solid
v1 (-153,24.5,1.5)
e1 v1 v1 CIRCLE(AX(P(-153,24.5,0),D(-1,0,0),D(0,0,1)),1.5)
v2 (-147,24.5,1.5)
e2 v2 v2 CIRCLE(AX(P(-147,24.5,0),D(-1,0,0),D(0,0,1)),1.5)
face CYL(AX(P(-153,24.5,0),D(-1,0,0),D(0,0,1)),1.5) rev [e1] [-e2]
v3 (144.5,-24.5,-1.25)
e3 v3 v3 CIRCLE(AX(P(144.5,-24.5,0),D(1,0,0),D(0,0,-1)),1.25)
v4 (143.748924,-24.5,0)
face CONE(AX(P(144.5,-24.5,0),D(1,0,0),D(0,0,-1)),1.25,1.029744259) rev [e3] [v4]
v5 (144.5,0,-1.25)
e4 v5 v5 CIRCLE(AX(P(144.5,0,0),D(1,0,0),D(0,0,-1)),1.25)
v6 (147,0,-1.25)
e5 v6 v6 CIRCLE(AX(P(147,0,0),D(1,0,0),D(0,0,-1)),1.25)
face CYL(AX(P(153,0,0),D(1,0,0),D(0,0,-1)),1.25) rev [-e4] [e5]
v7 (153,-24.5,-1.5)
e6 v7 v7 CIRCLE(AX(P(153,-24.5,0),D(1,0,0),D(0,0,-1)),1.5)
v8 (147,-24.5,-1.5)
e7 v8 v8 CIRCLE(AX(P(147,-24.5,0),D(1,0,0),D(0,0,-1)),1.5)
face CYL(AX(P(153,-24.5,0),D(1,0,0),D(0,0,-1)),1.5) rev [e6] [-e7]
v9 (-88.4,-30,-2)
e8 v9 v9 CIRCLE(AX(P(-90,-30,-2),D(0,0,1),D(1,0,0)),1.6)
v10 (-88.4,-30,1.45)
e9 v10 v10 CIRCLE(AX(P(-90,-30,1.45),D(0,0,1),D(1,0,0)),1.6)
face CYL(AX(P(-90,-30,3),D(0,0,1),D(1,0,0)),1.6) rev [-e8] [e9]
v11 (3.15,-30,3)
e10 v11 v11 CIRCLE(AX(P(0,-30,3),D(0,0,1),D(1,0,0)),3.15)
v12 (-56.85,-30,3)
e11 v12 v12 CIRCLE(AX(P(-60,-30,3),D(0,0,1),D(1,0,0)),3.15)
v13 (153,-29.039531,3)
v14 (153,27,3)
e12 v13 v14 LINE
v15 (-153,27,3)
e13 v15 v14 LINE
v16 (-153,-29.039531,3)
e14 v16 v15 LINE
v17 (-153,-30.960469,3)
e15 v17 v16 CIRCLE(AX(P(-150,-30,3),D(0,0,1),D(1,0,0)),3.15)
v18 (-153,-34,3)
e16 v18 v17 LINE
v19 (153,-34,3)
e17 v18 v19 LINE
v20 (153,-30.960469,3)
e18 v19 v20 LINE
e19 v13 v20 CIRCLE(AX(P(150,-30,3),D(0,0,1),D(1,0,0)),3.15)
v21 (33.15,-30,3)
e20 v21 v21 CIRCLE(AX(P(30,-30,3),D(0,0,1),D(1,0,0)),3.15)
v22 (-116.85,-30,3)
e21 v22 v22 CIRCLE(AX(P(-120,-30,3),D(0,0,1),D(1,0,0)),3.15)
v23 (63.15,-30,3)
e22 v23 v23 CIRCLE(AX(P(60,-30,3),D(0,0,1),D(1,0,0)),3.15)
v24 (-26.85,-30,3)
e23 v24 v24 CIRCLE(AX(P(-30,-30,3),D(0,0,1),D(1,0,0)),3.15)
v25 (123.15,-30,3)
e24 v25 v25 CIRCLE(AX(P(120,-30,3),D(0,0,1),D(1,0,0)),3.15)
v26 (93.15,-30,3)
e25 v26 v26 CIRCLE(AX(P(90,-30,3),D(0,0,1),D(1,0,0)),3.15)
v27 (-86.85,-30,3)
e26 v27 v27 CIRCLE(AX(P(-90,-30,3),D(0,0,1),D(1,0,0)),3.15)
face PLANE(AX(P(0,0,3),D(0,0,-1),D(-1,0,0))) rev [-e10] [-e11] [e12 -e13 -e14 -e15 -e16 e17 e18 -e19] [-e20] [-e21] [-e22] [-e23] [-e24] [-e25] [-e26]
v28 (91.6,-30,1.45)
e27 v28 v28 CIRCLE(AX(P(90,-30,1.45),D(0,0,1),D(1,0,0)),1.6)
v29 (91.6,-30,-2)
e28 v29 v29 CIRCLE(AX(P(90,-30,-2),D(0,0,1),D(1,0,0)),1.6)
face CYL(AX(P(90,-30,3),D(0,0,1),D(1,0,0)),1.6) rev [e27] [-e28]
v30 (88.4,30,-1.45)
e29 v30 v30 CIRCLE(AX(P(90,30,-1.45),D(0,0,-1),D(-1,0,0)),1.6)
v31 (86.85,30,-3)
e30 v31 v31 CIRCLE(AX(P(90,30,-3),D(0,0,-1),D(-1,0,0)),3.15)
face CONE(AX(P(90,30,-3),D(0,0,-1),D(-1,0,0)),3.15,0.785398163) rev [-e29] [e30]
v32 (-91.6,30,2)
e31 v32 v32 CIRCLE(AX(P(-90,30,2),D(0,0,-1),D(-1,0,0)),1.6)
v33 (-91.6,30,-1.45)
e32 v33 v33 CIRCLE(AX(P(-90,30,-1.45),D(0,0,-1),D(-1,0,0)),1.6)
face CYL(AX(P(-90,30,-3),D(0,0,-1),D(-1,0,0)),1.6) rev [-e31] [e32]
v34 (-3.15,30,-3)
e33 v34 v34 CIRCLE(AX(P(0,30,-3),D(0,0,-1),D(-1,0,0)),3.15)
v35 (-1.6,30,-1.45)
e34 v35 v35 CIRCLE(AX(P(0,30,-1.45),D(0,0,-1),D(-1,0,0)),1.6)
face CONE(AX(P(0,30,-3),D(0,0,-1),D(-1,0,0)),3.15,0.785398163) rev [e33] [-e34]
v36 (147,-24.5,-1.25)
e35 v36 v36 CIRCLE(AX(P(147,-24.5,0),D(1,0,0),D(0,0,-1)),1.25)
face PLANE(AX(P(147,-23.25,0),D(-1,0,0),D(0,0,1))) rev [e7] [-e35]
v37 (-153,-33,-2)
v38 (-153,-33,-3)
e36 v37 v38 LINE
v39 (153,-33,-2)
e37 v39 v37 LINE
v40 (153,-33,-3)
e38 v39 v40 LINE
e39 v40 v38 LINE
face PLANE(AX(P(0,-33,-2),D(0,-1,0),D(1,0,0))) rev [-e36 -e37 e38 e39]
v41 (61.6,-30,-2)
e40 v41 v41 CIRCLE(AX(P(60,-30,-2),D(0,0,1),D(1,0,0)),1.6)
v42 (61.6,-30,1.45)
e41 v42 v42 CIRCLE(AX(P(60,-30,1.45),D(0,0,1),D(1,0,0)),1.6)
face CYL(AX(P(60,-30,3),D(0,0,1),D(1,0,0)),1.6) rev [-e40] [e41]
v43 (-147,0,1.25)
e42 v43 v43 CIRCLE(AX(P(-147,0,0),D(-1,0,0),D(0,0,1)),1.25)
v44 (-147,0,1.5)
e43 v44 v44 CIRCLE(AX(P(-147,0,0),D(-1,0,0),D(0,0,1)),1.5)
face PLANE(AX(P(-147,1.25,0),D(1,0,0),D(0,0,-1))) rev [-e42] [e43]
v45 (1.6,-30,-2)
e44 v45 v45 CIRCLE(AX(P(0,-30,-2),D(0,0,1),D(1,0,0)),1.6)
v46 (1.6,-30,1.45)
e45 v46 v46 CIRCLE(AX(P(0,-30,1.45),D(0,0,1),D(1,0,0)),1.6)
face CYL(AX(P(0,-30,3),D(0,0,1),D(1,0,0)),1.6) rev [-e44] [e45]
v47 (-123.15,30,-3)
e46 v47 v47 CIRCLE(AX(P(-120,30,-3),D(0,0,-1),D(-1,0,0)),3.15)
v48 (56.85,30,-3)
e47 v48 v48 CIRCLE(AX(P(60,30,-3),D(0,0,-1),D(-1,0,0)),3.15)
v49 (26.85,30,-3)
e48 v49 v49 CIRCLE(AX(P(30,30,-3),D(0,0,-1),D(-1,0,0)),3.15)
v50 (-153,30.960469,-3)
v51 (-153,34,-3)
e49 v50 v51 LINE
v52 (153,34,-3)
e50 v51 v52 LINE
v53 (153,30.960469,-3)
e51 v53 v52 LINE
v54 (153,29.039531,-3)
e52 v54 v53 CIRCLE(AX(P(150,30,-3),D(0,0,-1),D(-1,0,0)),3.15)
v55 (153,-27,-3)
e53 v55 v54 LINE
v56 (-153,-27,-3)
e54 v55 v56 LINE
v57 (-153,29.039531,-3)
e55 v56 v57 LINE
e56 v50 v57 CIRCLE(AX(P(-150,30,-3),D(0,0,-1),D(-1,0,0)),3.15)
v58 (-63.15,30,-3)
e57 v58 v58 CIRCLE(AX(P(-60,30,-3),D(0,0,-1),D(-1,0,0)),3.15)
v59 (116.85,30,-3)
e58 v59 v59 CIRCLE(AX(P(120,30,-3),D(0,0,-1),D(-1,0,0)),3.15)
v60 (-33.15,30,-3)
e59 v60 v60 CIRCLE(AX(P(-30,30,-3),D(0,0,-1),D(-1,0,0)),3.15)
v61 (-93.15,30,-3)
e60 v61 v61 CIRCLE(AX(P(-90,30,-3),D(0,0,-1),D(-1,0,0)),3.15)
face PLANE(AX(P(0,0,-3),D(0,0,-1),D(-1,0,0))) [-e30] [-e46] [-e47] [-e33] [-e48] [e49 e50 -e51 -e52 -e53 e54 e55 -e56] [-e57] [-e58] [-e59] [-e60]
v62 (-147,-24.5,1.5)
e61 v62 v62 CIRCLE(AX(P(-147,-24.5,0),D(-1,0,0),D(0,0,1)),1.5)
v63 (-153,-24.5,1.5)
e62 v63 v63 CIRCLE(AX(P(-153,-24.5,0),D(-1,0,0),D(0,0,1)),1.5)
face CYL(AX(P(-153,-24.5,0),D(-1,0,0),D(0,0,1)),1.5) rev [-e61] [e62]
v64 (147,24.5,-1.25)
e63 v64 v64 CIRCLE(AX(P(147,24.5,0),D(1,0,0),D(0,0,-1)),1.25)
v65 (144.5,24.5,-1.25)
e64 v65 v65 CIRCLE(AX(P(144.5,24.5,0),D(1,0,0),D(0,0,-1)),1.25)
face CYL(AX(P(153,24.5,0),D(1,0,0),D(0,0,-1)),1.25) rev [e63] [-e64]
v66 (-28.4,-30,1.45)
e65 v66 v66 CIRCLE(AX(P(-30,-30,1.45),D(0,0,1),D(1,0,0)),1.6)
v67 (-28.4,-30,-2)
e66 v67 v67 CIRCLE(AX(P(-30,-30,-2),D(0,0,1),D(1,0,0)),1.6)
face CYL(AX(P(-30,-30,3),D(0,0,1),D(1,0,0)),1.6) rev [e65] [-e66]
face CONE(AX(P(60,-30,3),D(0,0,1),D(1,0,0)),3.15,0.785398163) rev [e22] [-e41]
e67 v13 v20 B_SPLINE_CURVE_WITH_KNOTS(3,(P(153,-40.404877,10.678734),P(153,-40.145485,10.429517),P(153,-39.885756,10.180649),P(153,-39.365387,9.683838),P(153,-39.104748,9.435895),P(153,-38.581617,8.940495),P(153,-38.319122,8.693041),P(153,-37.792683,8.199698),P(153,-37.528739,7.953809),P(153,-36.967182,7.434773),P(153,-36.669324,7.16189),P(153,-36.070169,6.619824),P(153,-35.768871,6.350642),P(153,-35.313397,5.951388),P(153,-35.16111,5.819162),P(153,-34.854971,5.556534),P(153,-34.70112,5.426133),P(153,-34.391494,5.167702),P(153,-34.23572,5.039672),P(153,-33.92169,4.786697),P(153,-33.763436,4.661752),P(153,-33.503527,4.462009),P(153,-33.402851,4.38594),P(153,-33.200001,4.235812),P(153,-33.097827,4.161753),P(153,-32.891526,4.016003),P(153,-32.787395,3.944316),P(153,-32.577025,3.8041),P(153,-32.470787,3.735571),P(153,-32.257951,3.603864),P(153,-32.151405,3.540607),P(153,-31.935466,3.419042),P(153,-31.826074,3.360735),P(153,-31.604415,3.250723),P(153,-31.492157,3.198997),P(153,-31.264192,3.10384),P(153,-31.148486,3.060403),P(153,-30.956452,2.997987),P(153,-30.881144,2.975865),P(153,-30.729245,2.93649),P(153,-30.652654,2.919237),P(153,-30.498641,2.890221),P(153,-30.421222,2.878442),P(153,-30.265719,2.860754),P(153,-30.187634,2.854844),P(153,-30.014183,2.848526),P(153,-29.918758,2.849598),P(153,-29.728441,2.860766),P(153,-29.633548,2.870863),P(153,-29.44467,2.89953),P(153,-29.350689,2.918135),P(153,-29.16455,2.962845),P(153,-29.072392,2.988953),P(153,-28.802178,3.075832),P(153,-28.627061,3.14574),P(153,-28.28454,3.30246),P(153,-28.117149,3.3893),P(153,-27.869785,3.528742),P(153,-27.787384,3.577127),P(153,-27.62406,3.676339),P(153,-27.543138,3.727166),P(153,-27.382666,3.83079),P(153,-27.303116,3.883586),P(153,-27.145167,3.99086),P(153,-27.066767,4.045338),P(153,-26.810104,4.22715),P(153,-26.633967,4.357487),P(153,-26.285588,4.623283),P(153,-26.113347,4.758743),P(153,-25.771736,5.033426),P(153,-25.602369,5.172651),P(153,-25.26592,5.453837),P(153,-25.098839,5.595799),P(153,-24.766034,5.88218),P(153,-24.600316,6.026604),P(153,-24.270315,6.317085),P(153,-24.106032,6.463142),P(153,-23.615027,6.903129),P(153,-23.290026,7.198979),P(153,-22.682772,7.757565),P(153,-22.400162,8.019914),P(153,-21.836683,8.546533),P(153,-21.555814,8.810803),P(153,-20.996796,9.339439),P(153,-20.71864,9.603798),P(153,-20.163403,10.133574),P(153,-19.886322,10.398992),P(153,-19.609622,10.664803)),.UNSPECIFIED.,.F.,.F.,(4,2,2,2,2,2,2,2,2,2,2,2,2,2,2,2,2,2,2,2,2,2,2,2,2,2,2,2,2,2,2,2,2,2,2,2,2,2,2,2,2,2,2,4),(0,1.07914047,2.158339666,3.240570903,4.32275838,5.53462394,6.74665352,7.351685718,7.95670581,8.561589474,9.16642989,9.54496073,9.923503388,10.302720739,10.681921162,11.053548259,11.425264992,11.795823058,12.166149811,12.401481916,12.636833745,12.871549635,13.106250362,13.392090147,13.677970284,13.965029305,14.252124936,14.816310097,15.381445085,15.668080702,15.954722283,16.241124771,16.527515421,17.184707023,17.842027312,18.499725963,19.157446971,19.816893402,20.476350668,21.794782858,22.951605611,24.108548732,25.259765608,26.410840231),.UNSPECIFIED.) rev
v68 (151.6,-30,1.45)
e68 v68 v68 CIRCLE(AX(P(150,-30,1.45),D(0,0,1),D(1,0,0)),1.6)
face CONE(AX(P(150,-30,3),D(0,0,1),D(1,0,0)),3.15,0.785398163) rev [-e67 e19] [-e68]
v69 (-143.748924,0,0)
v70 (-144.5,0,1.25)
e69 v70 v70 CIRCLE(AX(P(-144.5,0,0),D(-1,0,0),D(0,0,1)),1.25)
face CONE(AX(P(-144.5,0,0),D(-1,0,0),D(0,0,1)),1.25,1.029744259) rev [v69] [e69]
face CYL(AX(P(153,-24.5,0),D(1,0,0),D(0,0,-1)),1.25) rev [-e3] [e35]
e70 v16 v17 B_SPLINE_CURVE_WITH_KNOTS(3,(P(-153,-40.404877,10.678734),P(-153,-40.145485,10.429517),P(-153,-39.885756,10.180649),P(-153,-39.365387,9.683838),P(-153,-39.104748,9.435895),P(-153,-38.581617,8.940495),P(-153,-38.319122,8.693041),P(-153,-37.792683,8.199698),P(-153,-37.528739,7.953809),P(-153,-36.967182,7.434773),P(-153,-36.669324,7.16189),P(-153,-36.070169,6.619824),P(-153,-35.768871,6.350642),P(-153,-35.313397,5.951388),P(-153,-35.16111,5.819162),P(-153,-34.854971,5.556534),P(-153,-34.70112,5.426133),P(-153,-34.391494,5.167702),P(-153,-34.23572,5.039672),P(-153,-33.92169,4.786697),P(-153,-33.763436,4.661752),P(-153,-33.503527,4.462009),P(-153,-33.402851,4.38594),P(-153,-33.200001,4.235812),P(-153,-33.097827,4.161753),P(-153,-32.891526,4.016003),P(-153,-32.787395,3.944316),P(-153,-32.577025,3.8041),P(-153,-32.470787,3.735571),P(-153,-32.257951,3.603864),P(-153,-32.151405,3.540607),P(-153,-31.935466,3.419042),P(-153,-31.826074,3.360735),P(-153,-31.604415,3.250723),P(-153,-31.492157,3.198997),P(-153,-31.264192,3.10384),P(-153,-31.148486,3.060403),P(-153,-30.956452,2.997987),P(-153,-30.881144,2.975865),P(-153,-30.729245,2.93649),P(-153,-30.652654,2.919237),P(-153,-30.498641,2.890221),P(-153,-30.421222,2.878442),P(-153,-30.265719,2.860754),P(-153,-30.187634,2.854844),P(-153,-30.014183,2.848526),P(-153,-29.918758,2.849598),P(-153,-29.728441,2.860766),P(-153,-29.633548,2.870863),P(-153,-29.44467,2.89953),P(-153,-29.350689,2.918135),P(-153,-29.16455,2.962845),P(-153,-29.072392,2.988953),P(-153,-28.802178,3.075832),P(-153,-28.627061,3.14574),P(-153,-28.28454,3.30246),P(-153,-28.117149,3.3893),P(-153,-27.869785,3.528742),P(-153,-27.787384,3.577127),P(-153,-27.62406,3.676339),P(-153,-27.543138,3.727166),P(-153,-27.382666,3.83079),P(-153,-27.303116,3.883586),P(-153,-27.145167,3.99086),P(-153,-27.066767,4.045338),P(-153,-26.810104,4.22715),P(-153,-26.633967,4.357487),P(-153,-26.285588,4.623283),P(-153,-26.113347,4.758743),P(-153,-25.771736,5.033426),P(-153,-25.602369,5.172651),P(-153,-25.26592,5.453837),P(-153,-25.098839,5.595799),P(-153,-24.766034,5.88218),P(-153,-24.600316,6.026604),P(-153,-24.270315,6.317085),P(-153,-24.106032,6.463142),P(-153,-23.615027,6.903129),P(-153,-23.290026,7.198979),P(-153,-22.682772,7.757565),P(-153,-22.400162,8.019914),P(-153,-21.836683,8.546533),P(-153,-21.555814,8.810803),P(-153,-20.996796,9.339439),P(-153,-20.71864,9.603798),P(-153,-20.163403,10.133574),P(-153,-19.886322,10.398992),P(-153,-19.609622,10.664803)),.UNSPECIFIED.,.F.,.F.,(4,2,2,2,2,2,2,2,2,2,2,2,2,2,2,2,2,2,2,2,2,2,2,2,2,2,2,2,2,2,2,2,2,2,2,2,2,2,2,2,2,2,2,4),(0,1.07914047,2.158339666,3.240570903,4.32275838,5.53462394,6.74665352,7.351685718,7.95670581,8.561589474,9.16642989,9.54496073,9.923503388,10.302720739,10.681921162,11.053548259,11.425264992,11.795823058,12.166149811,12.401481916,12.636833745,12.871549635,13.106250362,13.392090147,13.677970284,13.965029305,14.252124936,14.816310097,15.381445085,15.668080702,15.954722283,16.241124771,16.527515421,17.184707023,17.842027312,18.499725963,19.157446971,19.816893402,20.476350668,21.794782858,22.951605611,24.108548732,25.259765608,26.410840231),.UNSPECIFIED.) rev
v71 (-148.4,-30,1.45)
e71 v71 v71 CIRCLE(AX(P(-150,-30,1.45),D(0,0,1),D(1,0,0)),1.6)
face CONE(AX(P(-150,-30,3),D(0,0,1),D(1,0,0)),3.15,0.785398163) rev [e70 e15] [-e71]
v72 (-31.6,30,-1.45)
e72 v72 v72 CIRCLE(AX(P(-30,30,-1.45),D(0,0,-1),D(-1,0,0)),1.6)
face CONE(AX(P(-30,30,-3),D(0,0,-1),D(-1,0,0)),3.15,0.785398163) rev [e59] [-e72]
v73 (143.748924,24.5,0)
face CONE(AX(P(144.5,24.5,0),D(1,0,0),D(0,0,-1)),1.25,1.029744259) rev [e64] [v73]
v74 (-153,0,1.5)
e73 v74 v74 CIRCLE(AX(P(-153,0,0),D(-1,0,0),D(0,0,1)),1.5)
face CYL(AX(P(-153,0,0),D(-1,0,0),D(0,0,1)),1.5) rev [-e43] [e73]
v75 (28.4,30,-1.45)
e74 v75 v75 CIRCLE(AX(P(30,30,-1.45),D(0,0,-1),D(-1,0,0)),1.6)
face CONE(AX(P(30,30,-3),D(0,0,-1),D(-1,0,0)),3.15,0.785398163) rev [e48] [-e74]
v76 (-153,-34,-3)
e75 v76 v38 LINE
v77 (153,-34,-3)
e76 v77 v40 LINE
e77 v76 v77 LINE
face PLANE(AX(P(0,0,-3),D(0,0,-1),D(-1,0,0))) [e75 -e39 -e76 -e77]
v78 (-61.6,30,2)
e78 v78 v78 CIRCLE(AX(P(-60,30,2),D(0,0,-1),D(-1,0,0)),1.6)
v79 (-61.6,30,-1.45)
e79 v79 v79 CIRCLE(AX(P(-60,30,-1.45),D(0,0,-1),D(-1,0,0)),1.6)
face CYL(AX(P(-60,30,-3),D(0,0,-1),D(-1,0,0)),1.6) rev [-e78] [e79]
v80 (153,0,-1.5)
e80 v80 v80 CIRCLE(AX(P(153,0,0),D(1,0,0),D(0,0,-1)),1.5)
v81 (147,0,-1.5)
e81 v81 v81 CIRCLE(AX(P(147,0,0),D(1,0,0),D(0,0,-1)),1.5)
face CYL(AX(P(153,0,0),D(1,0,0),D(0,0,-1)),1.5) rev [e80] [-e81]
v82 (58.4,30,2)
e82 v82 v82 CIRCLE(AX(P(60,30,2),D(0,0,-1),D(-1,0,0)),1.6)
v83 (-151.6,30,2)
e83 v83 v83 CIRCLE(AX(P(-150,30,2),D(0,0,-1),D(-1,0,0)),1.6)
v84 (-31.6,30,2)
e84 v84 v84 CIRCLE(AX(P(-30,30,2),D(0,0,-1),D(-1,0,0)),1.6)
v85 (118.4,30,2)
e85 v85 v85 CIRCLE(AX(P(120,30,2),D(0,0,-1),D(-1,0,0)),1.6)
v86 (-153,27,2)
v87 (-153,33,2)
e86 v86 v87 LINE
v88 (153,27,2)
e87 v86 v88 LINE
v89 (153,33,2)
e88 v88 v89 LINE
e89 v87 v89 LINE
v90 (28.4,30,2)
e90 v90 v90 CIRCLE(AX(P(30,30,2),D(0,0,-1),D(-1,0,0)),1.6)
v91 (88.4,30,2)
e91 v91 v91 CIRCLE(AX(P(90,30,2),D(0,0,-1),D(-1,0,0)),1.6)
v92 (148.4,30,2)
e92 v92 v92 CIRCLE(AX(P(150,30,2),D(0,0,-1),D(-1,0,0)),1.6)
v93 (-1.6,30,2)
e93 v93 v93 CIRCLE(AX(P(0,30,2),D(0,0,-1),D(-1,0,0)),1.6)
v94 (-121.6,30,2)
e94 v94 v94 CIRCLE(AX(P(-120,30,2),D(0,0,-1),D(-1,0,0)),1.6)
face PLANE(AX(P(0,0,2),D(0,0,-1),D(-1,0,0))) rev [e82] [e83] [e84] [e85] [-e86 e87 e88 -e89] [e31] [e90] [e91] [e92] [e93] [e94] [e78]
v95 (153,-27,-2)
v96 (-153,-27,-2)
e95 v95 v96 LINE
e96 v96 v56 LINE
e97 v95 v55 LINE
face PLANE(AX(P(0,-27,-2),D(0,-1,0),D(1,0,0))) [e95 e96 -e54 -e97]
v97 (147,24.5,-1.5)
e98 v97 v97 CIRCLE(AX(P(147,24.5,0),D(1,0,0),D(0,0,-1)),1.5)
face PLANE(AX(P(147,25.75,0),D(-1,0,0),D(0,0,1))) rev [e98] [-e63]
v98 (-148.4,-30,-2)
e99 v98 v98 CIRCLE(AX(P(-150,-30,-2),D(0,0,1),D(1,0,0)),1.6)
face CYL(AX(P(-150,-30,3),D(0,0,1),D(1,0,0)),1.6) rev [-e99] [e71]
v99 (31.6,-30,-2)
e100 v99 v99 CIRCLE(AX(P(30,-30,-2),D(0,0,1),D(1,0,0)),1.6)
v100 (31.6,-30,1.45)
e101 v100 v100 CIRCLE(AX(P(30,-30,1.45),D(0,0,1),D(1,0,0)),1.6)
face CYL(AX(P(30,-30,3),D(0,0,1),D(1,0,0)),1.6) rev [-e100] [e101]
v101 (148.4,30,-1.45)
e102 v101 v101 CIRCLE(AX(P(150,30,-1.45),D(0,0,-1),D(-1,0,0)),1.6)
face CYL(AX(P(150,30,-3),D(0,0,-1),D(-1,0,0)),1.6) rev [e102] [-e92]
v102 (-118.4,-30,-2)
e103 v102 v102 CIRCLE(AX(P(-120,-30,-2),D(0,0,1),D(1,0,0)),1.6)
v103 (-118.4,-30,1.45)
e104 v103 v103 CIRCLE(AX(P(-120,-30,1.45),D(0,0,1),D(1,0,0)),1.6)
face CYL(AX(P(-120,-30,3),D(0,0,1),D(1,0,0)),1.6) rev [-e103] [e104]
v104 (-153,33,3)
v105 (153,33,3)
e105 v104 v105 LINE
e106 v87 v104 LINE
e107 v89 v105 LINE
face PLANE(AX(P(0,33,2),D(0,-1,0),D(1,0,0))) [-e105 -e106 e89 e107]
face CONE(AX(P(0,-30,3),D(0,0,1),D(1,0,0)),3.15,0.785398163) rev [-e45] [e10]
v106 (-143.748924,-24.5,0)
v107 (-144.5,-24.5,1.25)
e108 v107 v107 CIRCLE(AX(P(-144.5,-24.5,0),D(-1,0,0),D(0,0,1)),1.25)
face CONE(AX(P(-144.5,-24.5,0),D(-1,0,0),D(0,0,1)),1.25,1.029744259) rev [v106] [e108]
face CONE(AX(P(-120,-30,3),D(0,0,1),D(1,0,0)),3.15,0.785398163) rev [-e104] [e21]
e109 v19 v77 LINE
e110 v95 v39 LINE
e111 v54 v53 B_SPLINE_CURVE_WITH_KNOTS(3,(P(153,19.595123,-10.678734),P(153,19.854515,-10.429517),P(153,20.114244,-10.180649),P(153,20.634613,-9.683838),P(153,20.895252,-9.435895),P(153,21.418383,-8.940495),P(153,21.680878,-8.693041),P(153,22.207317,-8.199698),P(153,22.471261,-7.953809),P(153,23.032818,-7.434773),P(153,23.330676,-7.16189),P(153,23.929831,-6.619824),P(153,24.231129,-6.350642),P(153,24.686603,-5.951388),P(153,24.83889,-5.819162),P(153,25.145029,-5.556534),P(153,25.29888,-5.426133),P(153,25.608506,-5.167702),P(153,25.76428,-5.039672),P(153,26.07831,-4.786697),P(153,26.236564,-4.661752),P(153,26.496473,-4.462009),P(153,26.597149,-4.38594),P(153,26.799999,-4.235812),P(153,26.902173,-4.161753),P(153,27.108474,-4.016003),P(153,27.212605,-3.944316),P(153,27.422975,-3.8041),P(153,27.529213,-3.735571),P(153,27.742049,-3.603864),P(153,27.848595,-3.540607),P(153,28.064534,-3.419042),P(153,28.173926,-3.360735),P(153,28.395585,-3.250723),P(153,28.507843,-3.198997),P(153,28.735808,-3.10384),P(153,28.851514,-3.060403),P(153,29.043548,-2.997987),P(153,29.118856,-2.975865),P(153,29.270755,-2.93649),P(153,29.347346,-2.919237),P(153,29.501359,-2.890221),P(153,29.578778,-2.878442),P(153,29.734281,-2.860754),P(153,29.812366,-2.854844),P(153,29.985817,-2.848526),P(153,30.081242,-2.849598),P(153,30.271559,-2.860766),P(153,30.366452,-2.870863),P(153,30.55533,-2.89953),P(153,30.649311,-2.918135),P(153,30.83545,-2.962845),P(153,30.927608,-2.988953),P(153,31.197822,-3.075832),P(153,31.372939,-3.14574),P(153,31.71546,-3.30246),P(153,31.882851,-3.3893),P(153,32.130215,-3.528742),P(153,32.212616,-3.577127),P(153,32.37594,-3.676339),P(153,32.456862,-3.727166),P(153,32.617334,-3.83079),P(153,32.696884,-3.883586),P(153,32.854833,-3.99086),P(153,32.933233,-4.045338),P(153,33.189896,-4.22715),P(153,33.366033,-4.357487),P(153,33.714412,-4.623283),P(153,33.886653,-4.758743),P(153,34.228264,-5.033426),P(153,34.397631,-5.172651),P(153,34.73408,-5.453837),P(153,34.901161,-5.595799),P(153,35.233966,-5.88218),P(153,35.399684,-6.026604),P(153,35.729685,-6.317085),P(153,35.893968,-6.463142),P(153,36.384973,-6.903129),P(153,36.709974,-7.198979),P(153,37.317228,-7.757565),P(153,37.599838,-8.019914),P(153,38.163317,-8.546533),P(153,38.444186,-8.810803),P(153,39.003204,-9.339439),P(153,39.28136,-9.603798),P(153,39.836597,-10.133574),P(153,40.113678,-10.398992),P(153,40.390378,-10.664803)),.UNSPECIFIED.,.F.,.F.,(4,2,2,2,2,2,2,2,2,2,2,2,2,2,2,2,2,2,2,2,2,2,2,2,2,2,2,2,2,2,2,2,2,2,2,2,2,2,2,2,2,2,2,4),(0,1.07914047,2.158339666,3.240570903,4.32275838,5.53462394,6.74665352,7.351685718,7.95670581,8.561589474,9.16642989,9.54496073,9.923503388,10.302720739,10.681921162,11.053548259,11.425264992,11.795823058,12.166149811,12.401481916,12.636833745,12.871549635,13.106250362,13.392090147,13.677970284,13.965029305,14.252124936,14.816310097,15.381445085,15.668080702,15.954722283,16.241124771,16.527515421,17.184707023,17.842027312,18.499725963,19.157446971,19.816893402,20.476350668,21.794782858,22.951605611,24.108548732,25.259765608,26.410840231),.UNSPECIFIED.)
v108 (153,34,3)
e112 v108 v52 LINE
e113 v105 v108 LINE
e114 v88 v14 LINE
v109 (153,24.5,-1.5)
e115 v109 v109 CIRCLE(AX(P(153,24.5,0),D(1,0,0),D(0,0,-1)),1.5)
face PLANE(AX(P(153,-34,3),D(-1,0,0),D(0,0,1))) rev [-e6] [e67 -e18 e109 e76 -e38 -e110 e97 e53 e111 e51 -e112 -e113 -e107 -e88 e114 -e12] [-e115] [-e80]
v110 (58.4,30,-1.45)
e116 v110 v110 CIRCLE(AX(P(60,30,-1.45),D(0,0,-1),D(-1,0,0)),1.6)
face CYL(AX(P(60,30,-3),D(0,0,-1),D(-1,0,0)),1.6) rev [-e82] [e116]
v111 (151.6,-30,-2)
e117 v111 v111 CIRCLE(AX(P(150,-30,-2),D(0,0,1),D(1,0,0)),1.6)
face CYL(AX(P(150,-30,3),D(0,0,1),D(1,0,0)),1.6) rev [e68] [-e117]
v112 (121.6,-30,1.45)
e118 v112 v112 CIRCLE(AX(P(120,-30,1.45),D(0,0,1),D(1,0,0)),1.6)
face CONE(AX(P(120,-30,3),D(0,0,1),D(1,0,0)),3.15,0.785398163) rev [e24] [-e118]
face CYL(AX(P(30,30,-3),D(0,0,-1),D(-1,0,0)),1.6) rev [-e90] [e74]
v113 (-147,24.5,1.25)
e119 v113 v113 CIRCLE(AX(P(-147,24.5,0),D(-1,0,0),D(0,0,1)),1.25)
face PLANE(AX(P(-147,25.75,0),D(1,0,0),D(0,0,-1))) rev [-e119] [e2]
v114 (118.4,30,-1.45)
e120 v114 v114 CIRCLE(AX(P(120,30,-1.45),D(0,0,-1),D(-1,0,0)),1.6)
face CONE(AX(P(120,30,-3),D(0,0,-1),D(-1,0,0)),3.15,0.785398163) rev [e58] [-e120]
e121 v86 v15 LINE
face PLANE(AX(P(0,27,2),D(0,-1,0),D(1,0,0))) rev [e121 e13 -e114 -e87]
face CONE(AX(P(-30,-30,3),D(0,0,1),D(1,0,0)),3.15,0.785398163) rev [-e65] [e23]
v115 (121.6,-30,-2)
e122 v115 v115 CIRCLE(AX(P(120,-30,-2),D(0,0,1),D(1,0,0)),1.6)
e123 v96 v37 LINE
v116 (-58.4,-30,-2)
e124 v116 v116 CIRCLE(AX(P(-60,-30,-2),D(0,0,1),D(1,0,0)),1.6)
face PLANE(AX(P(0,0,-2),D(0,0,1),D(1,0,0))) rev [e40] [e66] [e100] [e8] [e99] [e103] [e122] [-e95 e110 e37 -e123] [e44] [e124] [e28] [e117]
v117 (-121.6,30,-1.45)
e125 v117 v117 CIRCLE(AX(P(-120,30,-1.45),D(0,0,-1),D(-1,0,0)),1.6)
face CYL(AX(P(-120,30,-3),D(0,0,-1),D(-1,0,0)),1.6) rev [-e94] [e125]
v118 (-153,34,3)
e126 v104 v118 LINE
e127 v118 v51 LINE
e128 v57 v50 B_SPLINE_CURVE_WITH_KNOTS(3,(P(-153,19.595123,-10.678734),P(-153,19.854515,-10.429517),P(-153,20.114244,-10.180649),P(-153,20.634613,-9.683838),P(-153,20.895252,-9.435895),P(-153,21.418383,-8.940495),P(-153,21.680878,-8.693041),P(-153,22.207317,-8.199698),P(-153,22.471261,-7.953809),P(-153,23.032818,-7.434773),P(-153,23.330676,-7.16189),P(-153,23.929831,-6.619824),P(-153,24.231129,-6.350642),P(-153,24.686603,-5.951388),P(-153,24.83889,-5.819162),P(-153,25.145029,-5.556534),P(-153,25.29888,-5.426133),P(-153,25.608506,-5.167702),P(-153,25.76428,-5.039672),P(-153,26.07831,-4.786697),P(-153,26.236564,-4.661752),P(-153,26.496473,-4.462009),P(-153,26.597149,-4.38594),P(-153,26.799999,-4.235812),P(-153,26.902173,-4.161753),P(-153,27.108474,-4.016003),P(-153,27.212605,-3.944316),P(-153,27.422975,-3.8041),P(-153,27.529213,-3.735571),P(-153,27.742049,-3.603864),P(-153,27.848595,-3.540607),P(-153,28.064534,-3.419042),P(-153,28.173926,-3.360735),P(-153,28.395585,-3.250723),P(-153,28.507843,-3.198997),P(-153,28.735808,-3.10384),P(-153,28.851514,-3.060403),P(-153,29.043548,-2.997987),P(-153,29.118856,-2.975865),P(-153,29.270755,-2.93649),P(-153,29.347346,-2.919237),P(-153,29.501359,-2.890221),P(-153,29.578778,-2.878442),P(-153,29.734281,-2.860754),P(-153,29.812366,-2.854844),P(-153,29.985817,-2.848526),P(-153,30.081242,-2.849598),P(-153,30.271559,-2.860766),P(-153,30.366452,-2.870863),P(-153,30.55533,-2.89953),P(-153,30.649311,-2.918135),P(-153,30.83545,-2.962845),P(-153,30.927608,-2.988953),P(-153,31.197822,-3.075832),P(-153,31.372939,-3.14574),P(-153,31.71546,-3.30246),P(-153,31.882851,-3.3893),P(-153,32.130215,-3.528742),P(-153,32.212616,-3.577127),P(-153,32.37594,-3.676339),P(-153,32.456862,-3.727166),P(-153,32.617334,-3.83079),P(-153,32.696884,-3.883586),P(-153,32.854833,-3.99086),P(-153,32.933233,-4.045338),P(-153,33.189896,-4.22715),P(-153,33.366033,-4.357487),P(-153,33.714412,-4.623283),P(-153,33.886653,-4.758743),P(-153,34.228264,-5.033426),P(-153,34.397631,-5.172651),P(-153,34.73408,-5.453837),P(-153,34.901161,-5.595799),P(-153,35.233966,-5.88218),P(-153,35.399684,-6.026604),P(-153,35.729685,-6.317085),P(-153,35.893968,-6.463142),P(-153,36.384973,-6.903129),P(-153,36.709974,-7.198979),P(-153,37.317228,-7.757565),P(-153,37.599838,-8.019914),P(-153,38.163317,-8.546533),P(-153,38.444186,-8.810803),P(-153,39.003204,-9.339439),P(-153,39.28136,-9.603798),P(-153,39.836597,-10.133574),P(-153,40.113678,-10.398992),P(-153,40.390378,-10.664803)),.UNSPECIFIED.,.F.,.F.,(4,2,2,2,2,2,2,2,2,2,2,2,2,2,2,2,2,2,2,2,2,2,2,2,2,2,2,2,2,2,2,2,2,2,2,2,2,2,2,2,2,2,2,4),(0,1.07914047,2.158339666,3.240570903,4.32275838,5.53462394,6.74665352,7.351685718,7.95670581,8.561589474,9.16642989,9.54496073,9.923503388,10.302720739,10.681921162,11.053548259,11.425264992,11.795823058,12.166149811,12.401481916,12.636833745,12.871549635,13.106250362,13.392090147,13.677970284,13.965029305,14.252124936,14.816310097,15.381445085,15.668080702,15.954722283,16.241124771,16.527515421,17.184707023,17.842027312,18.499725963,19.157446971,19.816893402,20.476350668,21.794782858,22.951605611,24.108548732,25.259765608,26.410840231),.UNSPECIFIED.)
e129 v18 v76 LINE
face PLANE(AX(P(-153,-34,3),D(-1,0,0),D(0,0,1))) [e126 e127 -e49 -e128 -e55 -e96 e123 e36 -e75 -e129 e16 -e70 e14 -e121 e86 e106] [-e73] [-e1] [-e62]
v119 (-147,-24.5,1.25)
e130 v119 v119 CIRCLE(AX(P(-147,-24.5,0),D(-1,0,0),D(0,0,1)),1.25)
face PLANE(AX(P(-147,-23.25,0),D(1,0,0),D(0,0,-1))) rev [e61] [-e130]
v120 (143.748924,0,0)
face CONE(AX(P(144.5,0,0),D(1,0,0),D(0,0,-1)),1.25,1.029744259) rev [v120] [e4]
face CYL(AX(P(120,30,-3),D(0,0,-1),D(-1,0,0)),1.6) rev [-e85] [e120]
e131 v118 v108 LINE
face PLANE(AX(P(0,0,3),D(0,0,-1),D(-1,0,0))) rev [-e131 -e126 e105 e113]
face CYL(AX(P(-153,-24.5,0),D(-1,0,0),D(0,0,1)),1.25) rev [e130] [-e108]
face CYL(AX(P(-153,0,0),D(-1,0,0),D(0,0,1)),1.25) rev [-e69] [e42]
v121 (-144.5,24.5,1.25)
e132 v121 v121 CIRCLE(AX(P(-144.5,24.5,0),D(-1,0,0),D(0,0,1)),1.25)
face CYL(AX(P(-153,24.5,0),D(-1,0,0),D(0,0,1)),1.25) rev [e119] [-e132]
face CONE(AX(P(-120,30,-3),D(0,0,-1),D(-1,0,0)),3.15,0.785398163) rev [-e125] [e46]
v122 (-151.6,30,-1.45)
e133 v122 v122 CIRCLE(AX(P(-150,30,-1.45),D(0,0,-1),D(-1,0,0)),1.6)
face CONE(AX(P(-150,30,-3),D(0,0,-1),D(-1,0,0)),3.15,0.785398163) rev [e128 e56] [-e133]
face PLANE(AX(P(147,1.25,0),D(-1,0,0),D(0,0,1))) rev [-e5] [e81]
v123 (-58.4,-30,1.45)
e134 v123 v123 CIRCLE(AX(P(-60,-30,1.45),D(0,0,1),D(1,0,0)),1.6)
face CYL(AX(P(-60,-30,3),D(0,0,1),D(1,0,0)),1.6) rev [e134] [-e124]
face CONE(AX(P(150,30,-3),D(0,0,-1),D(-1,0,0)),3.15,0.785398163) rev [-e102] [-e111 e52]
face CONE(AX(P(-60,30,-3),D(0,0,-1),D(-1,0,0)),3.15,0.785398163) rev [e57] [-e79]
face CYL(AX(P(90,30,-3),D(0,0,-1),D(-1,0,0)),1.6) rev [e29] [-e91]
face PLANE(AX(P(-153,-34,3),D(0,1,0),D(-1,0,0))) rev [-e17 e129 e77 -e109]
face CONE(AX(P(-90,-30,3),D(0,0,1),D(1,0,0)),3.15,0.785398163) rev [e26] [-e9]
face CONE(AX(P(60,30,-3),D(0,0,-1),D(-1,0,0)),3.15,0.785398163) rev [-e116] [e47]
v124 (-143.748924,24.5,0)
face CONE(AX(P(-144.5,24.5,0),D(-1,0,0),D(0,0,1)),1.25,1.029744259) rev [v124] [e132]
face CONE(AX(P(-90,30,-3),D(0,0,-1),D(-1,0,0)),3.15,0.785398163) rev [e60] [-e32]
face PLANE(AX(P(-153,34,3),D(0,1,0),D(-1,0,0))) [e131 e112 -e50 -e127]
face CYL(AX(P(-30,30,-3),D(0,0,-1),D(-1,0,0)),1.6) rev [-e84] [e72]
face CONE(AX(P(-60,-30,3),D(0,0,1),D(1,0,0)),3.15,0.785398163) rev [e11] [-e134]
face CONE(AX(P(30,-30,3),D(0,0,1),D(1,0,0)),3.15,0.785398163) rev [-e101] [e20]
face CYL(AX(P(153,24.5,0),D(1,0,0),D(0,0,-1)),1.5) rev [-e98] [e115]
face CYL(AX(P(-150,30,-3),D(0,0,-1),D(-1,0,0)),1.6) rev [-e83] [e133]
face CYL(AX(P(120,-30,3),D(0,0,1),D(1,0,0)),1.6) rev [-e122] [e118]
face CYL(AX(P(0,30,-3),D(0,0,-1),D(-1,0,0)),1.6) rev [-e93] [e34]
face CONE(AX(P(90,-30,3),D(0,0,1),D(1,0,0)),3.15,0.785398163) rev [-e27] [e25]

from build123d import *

# Parameters (mm, degrees)
SKETCH_1_W                     = 306
SKETCH_1_H                     = 68
EXTRUDE_1_DEPTH                = 3
CUT_EXTRUDE_START              = 3
SKETCH_1_3_W                   = 306
SKETCH_1_3_H                   = 6
CUT_EXTRUDE_1_DEPTH            = 1
CUT_EXTRUDE_START_2            = -3
SKETCH_1_4_W                   = 306
SKETCH_1_4_H                   = 6
CUT_EXTRUDE_2_DEPTH            = 1
HOLE_START                     = -4
HOLE_WIZARD_M3_1_OUTLINE_R     = 1.6
HOLE_WIZARD_M3_1_DEPTH         = 8
M3X0_5_1_D                     = 2.5
M3X0_5_1_DEPTH                 = 8.5
M3X0_5_1_CBORE_D               = 3
M3X0_5_1_CBORE_DEPTH           = 6
M3X0_5_1_TIP                   = 0.751075774
M3X0_5_1_ON_FACE_2_D           = 2.5
M3X0_5_1_ON_FACE_2_DEPTH       = 8.5
M3X0_5_1_ON_FACE_2_CBORE_D     = 3
M3X0_5_1_ON_FACE_2_CBORE_DEPTH = 6
M3X0_5_1_ON_FACE_2_TIP         = 0.751075774
PATTERN_LINEAR_1_COUNT         = 11
PATTERN_LINEAR_1_PITCH         = 30


with BuildPart() as part:
    # ｽｹｯﾁ1 → ﾎﾞｽ - 押し出し1 (new, symmetric)
    with BuildSketch(Plane.XY):
        Rectangle(SKETCH_1_W, SKETCH_1_H)
    extrude(amount=EXTRUDE_1_DEPTH, both=True)

    # ｽｹｯﾁ1<3> → ｶｯﾄ - 押し出し1 (cut)
    with BuildSketch(Plane.XY.offset(CUT_EXTRUDE_START)):
        with Locations((0, 30)):
            Rectangle(SKETCH_1_3_W, SKETCH_1_3_H)
    extrude(amount=-CUT_EXTRUDE_1_DEPTH, mode=Mode.SUBTRACT)

    # ｽｹｯﾁ1<4> → ｶｯﾄ - 押し出し2 (cut)
    with BuildSketch(Plane.XY.offset(CUT_EXTRUDE_START_2)):
        with Locations((0, -30)):
            Rectangle(SKETCH_1_4_W, SKETCH_1_4_H)
    extrude(amount=CUT_EXTRUDE_2_DEPTH, mode=Mode.SUBTRACT)

    # M3 丸皿ねじ用皿穴1: read off the stored shape, not the designer's step
    # M3 丸皿ねじ用皿穴1 outline → M3 丸皿ねじ用皿穴1 (cut)
    with BuildSketch(Plane.XY.offset(HOLE_START)):
        with Locations((-150, -30)):
            Circle(HOLE_WIZARD_M3_1_OUTLINE_R)
        with Locations((-150, 30)):
            Circle(HOLE_WIZARD_M3_1_OUTLINE_R)
    hole_wizard_m3_1 = extrude(amount=HOLE_WIZARD_M3_1_DEPTH, mode=Mode.SUBTRACT)

    # Hole Wizard M3 _1 2: loft between two sections, ruled curve by curve
    hole_wizard_m3_1_2_from = [
        Edge.make_three_point_arc((-148.4, -30, 1.45), (-150, -28.4, 1.45), (-151.6, -30, 1.45)),
        Edge.make_three_point_arc((-151.6, -30, 1.45), (-150, -31.6, 1.45), (-148.4, -30, 1.45)),
    ]
    hole_wizard_m3_1_2_to = [
        Edge.make_three_point_arc((-146.849999512, -30, 3.000000488), (-150, -26.849999512, 3.000000488), (-153.150000488, -30, 3.000000488)),
        Edge.make_three_point_arc((-153.150000488, -30, 3.000000488), (-150, -33.150000488, 3.000000488), (-146.849999512, -30, 3.000000488)),
    ]
    hole_wizard_m3_1_2 = Solid(Shell([*[Face.make_surface_from_curves(hole_wizard_m3_1_2_from[k], hole_wizard_m3_1_2_to[k]) for k in range(2)], Face(Wire(hole_wizard_m3_1_2_from)), Face(Wire(hole_wizard_m3_1_2_to))]))
    add(hole_wizard_m3_1_2, mode=Mode.SUBTRACT)

    # Hole Wizard M3 _1 3: loft between two sections, ruled curve by curve
    hole_wizard_m3_1_3_from = [
        Edge.make_three_point_arc((-151.6, 30, -1.45), (-150, 31.6, -1.45), (-148.4, 30, -1.45)),
        Edge.make_three_point_arc((-148.4, 30, -1.45), (-150, 28.4, -1.45), (-151.6, 30, -1.45)),
    ]
    hole_wizard_m3_1_3_to = [
        Edge.make_three_point_arc((-153.150000488, 30, -3.000000488), (-150, 33.150000488, -3.000000488), (-146.849999512, 30, -3.000000488)),
        Edge.make_three_point_arc((-146.849999512, 30, -3.000000488), (-150, 26.849999512, -3.000000488), (-153.150000488, 30, -3.000000488)),
    ]
    hole_wizard_m3_1_3 = Solid(Shell([*[Face.make_surface_from_curves(hole_wizard_m3_1_3_from[k], hole_wizard_m3_1_3_to[k]) for k in range(2)], Face(Wire(hole_wizard_m3_1_3_from)), Face(Wire(hole_wizard_m3_1_3_to))]))
    add(hole_wizard_m3_1_3, mode=Mode.SUBTRACT)

    # M3x0.5 ねじ穴1
    with Locations(Plane(origin=(-153, 24.5, 0), x_dir=(0, 0, -1), z_dir=(-1, 0, 0))):
        with Locations((0, 0), (0, 49), (0, 24.5)):
            CounterBoreHole(M3X0_5_1_D / 2, M3X0_5_1_CBORE_D / 2, M3X0_5_1_CBORE_DEPTH, depth=M3X0_5_1_DEPTH)
            with Locations((0, 0, -(M3X0_5_1_DEPTH + M3X0_5_1_TIP / 2))):  # 118° drill point
                Cone(0, M3X0_5_1_D / 2, M3X0_5_1_TIP, mode=Mode.SUBTRACT)

    # M3x0.5 ねじ穴1 on face 2
    with Locations(Plane(origin=(153, 24.5, 0), x_dir=(0, 0, 1), z_dir=(1, 0, 0))):
        with Locations((0, 0), (0, 49), (0, 24.5)):
            CounterBoreHole(M3X0_5_1_ON_FACE_2_D / 2, M3X0_5_1_ON_FACE_2_CBORE_D / 2, M3X0_5_1_ON_FACE_2_CBORE_DEPTH, depth=M3X0_5_1_ON_FACE_2_DEPTH)
            with Locations((0, 0, -(M3X0_5_1_ON_FACE_2_DEPTH + M3X0_5_1_ON_FACE_2_TIP / 2))):  # 118° drill point
                Cone(0, M3X0_5_1_ON_FACE_2_D / 2, M3X0_5_1_ON_FACE_2_TIP, mode=Mode.SUBTRACT)

    # 直線ﾊﾟﾀｰﾝ1: M3 丸皿ねじ用皿穴1, Hole Wizard M3 _1 2, Hole Wizard M3 _1 3 ×11
    with Locations(*[(i * PATTERN_LINEAR_1_PITCH, 0, 0) for i in range(1, PATTERN_LINEAR_1_COUNT)]):
        add(hole_wizard_m3_1, mode=Mode.SUBTRACT)
        add(hole_wizard_m3_1_2, mode=Mode.SUBTRACT)
        add(hole_wizard_m3_1_3, mode=Mode.SUBTRACT)


solid = part.part
